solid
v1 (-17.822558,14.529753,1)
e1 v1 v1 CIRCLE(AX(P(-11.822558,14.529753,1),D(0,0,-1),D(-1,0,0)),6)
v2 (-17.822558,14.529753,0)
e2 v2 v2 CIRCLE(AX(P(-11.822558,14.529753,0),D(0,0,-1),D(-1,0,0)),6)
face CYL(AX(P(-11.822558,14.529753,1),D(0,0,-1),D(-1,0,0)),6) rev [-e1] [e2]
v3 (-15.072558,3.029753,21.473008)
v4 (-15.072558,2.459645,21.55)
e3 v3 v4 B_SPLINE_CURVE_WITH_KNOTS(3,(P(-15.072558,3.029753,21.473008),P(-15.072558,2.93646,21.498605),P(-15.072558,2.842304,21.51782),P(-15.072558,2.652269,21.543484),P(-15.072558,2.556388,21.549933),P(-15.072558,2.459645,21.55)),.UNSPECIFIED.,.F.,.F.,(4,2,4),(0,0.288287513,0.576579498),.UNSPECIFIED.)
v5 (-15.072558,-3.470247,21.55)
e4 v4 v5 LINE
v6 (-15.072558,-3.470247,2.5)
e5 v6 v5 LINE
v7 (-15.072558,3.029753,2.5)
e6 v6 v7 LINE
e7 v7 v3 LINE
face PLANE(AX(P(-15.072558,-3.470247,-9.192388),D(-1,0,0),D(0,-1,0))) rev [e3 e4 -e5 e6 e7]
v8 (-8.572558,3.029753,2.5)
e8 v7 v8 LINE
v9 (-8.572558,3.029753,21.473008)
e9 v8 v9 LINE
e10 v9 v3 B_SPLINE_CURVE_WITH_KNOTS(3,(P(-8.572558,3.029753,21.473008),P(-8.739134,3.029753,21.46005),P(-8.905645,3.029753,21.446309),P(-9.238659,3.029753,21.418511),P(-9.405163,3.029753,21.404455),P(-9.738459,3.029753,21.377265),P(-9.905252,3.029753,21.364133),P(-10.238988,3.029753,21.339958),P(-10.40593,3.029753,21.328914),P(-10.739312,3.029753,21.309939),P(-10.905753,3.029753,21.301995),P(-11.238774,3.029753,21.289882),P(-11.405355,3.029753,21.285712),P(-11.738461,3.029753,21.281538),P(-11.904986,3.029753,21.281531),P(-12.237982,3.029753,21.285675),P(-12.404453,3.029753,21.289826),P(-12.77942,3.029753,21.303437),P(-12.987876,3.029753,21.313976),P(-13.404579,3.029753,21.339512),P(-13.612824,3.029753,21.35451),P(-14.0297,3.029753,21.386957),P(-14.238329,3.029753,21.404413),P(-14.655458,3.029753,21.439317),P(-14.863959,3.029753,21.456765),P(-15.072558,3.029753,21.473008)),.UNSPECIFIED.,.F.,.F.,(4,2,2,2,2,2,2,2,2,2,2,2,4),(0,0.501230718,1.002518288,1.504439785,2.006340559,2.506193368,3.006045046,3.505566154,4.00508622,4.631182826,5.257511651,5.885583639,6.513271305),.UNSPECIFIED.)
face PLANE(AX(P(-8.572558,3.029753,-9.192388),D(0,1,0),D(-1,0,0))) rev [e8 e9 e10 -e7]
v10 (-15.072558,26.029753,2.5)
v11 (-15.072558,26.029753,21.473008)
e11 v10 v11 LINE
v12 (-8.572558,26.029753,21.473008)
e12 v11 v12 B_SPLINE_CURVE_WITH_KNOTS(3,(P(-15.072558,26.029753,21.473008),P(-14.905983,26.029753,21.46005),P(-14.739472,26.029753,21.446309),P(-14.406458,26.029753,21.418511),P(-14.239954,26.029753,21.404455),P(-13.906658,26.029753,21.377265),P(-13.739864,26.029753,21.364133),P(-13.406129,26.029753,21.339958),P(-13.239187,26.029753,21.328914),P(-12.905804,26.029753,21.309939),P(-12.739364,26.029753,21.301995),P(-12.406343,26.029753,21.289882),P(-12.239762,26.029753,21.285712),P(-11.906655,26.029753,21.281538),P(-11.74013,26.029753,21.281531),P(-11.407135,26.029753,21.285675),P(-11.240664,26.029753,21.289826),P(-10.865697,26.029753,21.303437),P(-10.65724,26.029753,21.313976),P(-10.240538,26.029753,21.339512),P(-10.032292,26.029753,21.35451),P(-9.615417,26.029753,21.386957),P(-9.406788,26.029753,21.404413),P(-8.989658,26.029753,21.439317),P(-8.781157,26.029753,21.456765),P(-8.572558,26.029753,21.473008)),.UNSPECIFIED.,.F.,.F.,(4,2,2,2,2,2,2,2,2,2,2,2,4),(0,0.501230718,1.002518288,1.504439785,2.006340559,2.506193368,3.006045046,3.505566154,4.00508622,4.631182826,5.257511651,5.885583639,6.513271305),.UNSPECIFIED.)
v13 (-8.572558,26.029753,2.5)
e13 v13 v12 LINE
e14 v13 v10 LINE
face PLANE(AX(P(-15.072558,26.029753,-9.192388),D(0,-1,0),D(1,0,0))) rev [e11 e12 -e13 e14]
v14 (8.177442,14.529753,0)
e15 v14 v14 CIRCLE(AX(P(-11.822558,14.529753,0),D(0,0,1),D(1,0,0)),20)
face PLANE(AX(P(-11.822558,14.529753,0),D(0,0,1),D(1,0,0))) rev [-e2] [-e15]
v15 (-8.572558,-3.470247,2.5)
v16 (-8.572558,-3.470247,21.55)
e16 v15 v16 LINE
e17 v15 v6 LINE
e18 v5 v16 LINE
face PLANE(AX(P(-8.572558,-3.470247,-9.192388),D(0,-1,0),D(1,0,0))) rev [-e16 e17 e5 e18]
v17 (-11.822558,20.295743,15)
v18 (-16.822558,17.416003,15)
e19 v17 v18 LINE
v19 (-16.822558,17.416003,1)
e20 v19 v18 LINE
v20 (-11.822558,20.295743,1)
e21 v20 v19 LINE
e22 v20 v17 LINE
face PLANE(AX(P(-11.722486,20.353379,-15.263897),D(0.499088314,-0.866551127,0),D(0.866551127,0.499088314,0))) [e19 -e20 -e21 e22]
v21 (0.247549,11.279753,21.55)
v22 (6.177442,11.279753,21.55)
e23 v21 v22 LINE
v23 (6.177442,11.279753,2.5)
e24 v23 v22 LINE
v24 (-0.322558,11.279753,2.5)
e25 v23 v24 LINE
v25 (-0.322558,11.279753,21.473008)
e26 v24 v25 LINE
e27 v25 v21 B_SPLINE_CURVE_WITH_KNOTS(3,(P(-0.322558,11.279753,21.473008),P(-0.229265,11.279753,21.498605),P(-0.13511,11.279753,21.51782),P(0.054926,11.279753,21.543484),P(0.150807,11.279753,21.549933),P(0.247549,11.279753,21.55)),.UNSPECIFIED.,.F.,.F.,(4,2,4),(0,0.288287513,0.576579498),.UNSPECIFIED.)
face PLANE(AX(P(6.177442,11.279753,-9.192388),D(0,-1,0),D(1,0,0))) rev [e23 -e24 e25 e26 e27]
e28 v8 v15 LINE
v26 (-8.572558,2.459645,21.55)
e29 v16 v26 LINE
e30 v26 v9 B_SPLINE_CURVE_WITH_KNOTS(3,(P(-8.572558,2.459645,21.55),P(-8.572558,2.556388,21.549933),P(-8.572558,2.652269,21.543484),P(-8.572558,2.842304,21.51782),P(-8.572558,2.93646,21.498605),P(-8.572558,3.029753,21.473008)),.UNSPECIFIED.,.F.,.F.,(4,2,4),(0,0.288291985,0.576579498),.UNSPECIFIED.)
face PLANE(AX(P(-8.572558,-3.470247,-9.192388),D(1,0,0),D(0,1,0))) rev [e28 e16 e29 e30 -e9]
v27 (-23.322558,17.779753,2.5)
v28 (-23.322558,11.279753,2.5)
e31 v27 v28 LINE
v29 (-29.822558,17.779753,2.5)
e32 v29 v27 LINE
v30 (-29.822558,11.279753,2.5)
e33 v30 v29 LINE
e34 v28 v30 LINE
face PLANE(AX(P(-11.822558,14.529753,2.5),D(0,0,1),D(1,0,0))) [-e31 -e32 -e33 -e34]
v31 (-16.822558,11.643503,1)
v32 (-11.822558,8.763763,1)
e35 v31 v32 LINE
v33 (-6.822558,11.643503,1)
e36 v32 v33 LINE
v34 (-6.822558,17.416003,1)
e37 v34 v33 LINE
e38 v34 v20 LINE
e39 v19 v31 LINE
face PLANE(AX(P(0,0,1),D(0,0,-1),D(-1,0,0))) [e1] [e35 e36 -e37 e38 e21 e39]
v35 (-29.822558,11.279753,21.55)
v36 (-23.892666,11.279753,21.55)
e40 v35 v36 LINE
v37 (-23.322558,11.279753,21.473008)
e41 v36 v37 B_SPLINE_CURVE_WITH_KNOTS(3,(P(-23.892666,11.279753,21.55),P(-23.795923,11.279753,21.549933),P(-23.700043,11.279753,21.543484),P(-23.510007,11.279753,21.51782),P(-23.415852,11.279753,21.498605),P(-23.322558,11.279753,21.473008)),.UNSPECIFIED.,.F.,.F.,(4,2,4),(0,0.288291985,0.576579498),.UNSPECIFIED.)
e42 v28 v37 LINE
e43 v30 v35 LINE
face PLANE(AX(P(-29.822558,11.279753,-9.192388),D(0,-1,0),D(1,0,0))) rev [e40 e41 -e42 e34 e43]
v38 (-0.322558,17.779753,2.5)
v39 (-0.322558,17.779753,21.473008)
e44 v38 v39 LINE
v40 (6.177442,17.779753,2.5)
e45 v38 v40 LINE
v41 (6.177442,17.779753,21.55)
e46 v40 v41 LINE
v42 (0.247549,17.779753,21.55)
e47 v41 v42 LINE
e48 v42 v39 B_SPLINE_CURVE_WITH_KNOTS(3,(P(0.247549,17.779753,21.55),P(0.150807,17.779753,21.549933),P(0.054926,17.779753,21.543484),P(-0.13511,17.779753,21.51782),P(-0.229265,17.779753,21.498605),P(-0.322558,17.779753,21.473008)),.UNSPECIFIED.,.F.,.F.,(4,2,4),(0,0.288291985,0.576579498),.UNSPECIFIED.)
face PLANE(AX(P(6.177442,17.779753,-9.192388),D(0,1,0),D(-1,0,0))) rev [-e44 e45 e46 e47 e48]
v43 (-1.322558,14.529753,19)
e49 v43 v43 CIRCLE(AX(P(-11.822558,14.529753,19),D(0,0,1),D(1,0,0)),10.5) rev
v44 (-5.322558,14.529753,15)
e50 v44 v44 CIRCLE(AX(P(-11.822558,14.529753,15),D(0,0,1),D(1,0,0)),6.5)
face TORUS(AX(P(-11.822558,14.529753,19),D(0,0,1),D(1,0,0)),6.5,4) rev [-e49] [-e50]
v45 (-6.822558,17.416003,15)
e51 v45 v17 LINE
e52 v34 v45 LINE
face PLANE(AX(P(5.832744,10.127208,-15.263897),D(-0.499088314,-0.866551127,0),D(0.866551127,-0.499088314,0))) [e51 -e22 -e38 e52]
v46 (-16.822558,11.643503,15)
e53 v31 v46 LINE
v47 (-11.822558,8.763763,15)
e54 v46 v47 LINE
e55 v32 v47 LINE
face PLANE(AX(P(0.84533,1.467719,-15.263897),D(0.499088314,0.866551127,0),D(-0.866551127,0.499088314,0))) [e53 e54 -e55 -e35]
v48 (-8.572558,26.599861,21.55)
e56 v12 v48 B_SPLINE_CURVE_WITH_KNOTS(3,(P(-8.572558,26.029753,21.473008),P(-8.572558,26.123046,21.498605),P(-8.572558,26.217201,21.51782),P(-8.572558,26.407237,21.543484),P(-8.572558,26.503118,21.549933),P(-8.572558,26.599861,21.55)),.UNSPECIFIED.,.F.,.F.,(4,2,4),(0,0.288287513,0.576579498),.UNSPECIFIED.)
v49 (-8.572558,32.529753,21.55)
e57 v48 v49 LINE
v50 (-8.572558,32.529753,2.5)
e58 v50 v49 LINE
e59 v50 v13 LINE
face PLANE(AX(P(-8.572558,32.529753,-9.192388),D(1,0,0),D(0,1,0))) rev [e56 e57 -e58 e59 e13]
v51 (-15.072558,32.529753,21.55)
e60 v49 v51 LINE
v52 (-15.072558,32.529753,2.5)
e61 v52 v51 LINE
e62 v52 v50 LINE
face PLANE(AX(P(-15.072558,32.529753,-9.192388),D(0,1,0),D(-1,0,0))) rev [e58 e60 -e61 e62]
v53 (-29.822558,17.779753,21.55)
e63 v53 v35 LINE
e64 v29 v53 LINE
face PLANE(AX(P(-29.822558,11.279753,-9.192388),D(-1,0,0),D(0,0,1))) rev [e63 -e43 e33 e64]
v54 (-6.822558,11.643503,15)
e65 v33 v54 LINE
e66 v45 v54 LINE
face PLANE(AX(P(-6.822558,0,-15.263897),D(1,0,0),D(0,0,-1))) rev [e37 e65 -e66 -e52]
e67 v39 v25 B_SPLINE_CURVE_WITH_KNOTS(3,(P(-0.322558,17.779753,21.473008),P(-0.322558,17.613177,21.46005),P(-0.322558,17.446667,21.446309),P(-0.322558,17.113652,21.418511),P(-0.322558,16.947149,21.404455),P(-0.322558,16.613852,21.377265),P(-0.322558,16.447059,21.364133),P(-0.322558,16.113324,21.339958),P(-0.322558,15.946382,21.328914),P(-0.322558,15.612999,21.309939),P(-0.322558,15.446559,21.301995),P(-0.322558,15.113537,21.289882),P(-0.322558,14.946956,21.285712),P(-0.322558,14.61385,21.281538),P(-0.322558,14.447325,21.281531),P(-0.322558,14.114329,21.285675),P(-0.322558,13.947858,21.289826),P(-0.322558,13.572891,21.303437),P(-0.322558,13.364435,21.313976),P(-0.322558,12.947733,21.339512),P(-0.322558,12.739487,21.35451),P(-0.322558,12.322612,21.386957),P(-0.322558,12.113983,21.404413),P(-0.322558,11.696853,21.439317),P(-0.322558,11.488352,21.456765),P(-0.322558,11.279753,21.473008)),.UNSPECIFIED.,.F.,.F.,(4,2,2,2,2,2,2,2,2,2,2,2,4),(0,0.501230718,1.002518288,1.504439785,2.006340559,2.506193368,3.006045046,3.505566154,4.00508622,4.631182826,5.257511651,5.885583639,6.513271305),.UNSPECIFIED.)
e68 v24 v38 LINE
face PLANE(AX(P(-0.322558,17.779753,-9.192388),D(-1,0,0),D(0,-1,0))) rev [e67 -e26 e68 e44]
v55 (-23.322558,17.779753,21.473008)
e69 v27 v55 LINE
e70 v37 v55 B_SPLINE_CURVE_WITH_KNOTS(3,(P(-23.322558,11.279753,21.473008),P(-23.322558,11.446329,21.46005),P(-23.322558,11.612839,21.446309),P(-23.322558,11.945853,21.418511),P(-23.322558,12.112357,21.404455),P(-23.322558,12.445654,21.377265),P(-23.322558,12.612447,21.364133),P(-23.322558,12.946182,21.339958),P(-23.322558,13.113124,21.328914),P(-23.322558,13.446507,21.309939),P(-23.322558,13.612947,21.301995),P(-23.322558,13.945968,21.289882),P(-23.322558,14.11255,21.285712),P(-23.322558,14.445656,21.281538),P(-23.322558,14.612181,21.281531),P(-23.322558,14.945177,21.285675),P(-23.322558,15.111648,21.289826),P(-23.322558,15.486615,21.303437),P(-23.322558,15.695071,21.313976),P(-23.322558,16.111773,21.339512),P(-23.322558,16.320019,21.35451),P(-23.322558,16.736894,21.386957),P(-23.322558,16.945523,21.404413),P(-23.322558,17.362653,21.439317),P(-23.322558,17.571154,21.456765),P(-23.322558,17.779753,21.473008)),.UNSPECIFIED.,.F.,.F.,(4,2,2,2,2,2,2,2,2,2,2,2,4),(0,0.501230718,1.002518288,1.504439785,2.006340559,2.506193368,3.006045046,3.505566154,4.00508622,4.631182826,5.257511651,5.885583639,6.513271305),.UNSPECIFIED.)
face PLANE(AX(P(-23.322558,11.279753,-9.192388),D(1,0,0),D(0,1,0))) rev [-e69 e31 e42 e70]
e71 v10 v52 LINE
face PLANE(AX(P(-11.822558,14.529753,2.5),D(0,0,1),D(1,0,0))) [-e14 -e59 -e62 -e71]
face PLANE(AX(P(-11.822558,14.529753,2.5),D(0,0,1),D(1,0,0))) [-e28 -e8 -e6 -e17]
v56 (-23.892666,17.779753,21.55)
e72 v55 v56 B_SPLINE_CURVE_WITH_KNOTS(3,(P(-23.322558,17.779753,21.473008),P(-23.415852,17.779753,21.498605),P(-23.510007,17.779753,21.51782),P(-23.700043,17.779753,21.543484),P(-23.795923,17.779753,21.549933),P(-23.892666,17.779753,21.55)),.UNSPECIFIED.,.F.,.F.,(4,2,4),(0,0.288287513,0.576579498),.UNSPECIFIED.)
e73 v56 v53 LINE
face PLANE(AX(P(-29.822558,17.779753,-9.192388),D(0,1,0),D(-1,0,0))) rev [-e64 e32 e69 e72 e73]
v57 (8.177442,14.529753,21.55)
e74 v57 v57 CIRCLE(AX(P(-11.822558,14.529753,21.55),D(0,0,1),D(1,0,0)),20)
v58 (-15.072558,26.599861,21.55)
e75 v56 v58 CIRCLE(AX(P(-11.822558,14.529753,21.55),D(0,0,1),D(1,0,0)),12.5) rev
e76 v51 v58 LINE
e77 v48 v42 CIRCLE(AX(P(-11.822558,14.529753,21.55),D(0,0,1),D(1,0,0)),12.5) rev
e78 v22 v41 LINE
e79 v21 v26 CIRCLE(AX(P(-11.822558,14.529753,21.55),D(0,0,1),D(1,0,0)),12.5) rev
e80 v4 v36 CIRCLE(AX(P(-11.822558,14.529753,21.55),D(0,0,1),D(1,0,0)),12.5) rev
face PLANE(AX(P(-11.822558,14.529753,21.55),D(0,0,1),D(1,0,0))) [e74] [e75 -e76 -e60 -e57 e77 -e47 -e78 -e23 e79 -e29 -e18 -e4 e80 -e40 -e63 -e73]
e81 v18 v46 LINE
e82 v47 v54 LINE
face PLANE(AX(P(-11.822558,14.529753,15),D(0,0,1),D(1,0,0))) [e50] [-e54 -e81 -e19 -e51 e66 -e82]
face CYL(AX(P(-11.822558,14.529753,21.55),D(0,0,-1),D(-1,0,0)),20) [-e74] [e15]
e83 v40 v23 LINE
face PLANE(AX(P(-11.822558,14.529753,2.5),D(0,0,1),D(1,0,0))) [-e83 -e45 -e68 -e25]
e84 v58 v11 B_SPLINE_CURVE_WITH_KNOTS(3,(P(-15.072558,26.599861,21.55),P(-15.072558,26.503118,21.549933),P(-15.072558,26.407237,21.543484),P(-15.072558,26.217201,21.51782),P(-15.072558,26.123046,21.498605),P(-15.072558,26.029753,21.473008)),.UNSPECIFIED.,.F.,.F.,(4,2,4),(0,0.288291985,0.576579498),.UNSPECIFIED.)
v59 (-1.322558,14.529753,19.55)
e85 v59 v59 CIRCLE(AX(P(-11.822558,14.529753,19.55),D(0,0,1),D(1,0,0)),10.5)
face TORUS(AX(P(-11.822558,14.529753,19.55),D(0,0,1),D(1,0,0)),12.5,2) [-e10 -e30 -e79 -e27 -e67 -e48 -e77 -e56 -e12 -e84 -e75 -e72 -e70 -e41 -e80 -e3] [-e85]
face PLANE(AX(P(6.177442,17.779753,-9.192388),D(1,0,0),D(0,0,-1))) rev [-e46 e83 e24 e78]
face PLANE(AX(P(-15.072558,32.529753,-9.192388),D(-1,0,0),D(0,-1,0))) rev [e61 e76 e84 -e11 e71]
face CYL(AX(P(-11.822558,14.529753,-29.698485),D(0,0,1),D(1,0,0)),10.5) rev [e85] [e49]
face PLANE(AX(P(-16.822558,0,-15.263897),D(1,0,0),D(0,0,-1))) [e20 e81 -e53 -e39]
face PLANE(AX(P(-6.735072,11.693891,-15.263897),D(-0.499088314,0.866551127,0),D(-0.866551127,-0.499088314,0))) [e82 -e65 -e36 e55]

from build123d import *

# Parameters (mm, degrees)
SKETCH1_R                       = 20
SKETCH1_R_2                     = 1
BOSS_EXTRUDE1_DEPTH             = 21.55
TAP_DRILL_FOR_M5X0_8_TAP1_D     = 4.2
TAP_DRILL_FOR_M5X0_8_TAP1_DEPTH = 5
TAP_DRILL_FOR_M5X0_8_TAP1_TIP   = 1.2618073
SKETCH4_W                       = 6.5
SKETCH4_H                       = 6.5
CUT_EXTRUDE1_DEPTH              = 19.05
CIRPATTERN1_COUNT               = 4
SKETCH5_R                       = 6
SKETCH5_R_2                     = 5
SKETCH5_R_3                     = 1
CUT_EXTRUDE2_DEPTH              = 1
CUT_EXTRUDE3_START              = -21.55
SKETCH6_W                       = 10
SKETCH6_H                       = 5.7725
SKETCH6_R                       = 2.1
CUT_EXTRUDE3_DEPTH              = 21.55
SKETCH7_R                       = 10.5
CUT_EXTRUDE4_DEPTH              = 6.55
FILLET4_R                       = 2
FILLET5_R                       = 4


with BuildPart() as part:
    # Sketch1 → Boss-Extrude1 (new body)
    with BuildSketch(Plane.XY):
        with Locations((-11.822558412, 14.529752947)):
            Circle(SKETCH1_R)
        with Locations((-11.822558412, 14.529752947)):
            Circle(SKETCH1_R_2, mode=Mode.SUBTRACT)
    extrude(amount=BOSS_EXTRUDE1_DEPTH)

    # Tap Drill for M5x0.8 Tap1
    with Locations(Plane.XY.offset(21.55)):
        with Locations((-11.822558412, 14.529752947)):
            Hole(TAP_DRILL_FOR_M5X0_8_TAP1_D / 2, depth=TAP_DRILL_FOR_M5X0_8_TAP1_DEPTH)
            with Locations((0, 0, -(TAP_DRILL_FOR_M5X0_8_TAP1_DEPTH + TAP_DRILL_FOR_M5X0_8_TAP1_TIP / 2))):  # 118° drill point
                Cone(0, TAP_DRILL_FOR_M5X0_8_TAP1_D / 2, TAP_DRILL_FOR_M5X0_8_TAP1_TIP, mode=Mode.SUBTRACT)

    # Sketch4 → Cut-Extrude1 (cut)
    with BuildSketch(Plane.XY.offset(21.55)):
        with Locations((2.927441588, 14.529752947)):
            Rectangle(SKETCH4_W, SKETCH4_H)
    cut_extrude1 = extrude(amount=-CUT_EXTRUDE1_DEPTH, mode=Mode.SUBTRACT)

    # CirPattern1: Cut-Extrude1 ×4 about axis
    cirpattern1_axis = Axis((-11.822558412, 14.529752947, 0), (0, 0, 1))
    for i in range(1, CIRPATTERN1_COUNT):
        add(cut_extrude1.rotate(cirpattern1_axis, i * 360 / CIRPATTERN1_COUNT), mode=Mode.SUBTRACT)

    # Sketch5 → Cut-Extrude2 (cut)
    # profile 1 of 2: a face of its own
    with BuildSketch(Plane(origin=(0, 0, 0), x_dir=(-1, 0, 0), z_dir=(0, 0, -1))):
        with Locations((11.822558412, 14.529752947)):
            Circle(SKETCH5_R)
        with Locations((11.822558412, 14.529752947)):
            Circle(SKETCH5_R_2, mode=Mode.SUBTRACT)
    # profile 2 of 2: a face of its own
    with BuildSketch(Plane(origin=(0, 0, 0), x_dir=(-1, 0, 0), z_dir=(0, 0, -1))):
        with Locations((11.822558412, 14.529752947)):
            Circle(SKETCH5_R_2)
        with Locations((11.822558412, 14.529752947)):
            Circle(SKETCH5_R_3, mode=Mode.SUBTRACT)
    extrude(amount=-CUT_EXTRUDE2_DEPTH, mode=Mode.SUBTRACT)

    # Sketch6 → Cut-Extrude3 (cut)
    # profile 1 of 4: a face of its own
    with BuildSketch(Plane.XY.offset(21.55).offset(CUT_EXTRUDE3_START)):
        with Locations((-11.822558412, 14.529752947)):
            Rectangle(SKETCH6_W, SKETCH6_H)
        with Locations((-11.822558412, 14.529752947)):
            Circle(SKETCH6_R, mode=Mode.SUBTRACT)
    # profile 2 of 4: a face of its own
    with BuildSketch(Plane.XY.offset(21.55).offset(CUT_EXTRUDE3_START)):
        with Locations((-11.822558412, 14.529752947)):
            Circle(SKETCH6_R)
    # profile 3 of 4: a face of its own
    with BuildSketch(Plane.XY.offset(21.55).offset(CUT_EXTRUDE3_START)):
        Polygon((-11.822558412, 20.295742519), (-6.822558412, 17.416002947), (-16.822558412, 17.416002947), align=None)
    # profile 4 of 4: a face of its own
    with BuildSketch(Plane.XY.offset(21.55).offset(CUT_EXTRUDE3_START)):
        Polygon((-11.822558412, 8.763763375), (-16.822558412, 11.643502947), (-6.822558412, 11.643502947), align=None)
    extrude(amount=CUT_EXTRUDE3_DEPTH, mode=Mode.SUBTRACT)

    # Sketch7 → Cut-Extrude4 (cut)
    with BuildSketch(Plane.XY.offset(21.55)):
        with Locations((-11.822558412, 14.529752947)):
            Circle(SKETCH7_R)
    extrude(amount=-CUT_EXTRUDE4_DEPTH, mode=Mode.SUBTRACT)

    # Fillet4
    # the kernel refuses this fillet: 2 mm, written as the material it takes off along each edge
    with BuildSketch(Plane(origin=(-11.822558412, 14.529752947, 21.55), x_dir=(1, 0, 0), z_dir=(0, -1, 0))) as fillet4_piece_1:
        with BuildLine():
            CenterArc((10.5 + FILLET4_R, -FILLET4_R), FILLET4_R, 90, 90)
            Line((10.5, -FILLET4_R), (10.5, 0))
            Line((10.5, 0), (10.5 + FILLET4_R, 0))
        make_face()
    revolve(axis=Axis((-11.822558412, 14.529752947, 21.55), (0, 0, 1)), mode=Mode.SUBTRACT)

    # Fillet5
    fillet5_edges = [part.edges().sort_by_distance(p)[0] for p in [
        (-22.322558412, 14.529752947, 15),
    ]]
    fillet(fillet5_edges, radius=FILLET5_R)


solid = part.part
